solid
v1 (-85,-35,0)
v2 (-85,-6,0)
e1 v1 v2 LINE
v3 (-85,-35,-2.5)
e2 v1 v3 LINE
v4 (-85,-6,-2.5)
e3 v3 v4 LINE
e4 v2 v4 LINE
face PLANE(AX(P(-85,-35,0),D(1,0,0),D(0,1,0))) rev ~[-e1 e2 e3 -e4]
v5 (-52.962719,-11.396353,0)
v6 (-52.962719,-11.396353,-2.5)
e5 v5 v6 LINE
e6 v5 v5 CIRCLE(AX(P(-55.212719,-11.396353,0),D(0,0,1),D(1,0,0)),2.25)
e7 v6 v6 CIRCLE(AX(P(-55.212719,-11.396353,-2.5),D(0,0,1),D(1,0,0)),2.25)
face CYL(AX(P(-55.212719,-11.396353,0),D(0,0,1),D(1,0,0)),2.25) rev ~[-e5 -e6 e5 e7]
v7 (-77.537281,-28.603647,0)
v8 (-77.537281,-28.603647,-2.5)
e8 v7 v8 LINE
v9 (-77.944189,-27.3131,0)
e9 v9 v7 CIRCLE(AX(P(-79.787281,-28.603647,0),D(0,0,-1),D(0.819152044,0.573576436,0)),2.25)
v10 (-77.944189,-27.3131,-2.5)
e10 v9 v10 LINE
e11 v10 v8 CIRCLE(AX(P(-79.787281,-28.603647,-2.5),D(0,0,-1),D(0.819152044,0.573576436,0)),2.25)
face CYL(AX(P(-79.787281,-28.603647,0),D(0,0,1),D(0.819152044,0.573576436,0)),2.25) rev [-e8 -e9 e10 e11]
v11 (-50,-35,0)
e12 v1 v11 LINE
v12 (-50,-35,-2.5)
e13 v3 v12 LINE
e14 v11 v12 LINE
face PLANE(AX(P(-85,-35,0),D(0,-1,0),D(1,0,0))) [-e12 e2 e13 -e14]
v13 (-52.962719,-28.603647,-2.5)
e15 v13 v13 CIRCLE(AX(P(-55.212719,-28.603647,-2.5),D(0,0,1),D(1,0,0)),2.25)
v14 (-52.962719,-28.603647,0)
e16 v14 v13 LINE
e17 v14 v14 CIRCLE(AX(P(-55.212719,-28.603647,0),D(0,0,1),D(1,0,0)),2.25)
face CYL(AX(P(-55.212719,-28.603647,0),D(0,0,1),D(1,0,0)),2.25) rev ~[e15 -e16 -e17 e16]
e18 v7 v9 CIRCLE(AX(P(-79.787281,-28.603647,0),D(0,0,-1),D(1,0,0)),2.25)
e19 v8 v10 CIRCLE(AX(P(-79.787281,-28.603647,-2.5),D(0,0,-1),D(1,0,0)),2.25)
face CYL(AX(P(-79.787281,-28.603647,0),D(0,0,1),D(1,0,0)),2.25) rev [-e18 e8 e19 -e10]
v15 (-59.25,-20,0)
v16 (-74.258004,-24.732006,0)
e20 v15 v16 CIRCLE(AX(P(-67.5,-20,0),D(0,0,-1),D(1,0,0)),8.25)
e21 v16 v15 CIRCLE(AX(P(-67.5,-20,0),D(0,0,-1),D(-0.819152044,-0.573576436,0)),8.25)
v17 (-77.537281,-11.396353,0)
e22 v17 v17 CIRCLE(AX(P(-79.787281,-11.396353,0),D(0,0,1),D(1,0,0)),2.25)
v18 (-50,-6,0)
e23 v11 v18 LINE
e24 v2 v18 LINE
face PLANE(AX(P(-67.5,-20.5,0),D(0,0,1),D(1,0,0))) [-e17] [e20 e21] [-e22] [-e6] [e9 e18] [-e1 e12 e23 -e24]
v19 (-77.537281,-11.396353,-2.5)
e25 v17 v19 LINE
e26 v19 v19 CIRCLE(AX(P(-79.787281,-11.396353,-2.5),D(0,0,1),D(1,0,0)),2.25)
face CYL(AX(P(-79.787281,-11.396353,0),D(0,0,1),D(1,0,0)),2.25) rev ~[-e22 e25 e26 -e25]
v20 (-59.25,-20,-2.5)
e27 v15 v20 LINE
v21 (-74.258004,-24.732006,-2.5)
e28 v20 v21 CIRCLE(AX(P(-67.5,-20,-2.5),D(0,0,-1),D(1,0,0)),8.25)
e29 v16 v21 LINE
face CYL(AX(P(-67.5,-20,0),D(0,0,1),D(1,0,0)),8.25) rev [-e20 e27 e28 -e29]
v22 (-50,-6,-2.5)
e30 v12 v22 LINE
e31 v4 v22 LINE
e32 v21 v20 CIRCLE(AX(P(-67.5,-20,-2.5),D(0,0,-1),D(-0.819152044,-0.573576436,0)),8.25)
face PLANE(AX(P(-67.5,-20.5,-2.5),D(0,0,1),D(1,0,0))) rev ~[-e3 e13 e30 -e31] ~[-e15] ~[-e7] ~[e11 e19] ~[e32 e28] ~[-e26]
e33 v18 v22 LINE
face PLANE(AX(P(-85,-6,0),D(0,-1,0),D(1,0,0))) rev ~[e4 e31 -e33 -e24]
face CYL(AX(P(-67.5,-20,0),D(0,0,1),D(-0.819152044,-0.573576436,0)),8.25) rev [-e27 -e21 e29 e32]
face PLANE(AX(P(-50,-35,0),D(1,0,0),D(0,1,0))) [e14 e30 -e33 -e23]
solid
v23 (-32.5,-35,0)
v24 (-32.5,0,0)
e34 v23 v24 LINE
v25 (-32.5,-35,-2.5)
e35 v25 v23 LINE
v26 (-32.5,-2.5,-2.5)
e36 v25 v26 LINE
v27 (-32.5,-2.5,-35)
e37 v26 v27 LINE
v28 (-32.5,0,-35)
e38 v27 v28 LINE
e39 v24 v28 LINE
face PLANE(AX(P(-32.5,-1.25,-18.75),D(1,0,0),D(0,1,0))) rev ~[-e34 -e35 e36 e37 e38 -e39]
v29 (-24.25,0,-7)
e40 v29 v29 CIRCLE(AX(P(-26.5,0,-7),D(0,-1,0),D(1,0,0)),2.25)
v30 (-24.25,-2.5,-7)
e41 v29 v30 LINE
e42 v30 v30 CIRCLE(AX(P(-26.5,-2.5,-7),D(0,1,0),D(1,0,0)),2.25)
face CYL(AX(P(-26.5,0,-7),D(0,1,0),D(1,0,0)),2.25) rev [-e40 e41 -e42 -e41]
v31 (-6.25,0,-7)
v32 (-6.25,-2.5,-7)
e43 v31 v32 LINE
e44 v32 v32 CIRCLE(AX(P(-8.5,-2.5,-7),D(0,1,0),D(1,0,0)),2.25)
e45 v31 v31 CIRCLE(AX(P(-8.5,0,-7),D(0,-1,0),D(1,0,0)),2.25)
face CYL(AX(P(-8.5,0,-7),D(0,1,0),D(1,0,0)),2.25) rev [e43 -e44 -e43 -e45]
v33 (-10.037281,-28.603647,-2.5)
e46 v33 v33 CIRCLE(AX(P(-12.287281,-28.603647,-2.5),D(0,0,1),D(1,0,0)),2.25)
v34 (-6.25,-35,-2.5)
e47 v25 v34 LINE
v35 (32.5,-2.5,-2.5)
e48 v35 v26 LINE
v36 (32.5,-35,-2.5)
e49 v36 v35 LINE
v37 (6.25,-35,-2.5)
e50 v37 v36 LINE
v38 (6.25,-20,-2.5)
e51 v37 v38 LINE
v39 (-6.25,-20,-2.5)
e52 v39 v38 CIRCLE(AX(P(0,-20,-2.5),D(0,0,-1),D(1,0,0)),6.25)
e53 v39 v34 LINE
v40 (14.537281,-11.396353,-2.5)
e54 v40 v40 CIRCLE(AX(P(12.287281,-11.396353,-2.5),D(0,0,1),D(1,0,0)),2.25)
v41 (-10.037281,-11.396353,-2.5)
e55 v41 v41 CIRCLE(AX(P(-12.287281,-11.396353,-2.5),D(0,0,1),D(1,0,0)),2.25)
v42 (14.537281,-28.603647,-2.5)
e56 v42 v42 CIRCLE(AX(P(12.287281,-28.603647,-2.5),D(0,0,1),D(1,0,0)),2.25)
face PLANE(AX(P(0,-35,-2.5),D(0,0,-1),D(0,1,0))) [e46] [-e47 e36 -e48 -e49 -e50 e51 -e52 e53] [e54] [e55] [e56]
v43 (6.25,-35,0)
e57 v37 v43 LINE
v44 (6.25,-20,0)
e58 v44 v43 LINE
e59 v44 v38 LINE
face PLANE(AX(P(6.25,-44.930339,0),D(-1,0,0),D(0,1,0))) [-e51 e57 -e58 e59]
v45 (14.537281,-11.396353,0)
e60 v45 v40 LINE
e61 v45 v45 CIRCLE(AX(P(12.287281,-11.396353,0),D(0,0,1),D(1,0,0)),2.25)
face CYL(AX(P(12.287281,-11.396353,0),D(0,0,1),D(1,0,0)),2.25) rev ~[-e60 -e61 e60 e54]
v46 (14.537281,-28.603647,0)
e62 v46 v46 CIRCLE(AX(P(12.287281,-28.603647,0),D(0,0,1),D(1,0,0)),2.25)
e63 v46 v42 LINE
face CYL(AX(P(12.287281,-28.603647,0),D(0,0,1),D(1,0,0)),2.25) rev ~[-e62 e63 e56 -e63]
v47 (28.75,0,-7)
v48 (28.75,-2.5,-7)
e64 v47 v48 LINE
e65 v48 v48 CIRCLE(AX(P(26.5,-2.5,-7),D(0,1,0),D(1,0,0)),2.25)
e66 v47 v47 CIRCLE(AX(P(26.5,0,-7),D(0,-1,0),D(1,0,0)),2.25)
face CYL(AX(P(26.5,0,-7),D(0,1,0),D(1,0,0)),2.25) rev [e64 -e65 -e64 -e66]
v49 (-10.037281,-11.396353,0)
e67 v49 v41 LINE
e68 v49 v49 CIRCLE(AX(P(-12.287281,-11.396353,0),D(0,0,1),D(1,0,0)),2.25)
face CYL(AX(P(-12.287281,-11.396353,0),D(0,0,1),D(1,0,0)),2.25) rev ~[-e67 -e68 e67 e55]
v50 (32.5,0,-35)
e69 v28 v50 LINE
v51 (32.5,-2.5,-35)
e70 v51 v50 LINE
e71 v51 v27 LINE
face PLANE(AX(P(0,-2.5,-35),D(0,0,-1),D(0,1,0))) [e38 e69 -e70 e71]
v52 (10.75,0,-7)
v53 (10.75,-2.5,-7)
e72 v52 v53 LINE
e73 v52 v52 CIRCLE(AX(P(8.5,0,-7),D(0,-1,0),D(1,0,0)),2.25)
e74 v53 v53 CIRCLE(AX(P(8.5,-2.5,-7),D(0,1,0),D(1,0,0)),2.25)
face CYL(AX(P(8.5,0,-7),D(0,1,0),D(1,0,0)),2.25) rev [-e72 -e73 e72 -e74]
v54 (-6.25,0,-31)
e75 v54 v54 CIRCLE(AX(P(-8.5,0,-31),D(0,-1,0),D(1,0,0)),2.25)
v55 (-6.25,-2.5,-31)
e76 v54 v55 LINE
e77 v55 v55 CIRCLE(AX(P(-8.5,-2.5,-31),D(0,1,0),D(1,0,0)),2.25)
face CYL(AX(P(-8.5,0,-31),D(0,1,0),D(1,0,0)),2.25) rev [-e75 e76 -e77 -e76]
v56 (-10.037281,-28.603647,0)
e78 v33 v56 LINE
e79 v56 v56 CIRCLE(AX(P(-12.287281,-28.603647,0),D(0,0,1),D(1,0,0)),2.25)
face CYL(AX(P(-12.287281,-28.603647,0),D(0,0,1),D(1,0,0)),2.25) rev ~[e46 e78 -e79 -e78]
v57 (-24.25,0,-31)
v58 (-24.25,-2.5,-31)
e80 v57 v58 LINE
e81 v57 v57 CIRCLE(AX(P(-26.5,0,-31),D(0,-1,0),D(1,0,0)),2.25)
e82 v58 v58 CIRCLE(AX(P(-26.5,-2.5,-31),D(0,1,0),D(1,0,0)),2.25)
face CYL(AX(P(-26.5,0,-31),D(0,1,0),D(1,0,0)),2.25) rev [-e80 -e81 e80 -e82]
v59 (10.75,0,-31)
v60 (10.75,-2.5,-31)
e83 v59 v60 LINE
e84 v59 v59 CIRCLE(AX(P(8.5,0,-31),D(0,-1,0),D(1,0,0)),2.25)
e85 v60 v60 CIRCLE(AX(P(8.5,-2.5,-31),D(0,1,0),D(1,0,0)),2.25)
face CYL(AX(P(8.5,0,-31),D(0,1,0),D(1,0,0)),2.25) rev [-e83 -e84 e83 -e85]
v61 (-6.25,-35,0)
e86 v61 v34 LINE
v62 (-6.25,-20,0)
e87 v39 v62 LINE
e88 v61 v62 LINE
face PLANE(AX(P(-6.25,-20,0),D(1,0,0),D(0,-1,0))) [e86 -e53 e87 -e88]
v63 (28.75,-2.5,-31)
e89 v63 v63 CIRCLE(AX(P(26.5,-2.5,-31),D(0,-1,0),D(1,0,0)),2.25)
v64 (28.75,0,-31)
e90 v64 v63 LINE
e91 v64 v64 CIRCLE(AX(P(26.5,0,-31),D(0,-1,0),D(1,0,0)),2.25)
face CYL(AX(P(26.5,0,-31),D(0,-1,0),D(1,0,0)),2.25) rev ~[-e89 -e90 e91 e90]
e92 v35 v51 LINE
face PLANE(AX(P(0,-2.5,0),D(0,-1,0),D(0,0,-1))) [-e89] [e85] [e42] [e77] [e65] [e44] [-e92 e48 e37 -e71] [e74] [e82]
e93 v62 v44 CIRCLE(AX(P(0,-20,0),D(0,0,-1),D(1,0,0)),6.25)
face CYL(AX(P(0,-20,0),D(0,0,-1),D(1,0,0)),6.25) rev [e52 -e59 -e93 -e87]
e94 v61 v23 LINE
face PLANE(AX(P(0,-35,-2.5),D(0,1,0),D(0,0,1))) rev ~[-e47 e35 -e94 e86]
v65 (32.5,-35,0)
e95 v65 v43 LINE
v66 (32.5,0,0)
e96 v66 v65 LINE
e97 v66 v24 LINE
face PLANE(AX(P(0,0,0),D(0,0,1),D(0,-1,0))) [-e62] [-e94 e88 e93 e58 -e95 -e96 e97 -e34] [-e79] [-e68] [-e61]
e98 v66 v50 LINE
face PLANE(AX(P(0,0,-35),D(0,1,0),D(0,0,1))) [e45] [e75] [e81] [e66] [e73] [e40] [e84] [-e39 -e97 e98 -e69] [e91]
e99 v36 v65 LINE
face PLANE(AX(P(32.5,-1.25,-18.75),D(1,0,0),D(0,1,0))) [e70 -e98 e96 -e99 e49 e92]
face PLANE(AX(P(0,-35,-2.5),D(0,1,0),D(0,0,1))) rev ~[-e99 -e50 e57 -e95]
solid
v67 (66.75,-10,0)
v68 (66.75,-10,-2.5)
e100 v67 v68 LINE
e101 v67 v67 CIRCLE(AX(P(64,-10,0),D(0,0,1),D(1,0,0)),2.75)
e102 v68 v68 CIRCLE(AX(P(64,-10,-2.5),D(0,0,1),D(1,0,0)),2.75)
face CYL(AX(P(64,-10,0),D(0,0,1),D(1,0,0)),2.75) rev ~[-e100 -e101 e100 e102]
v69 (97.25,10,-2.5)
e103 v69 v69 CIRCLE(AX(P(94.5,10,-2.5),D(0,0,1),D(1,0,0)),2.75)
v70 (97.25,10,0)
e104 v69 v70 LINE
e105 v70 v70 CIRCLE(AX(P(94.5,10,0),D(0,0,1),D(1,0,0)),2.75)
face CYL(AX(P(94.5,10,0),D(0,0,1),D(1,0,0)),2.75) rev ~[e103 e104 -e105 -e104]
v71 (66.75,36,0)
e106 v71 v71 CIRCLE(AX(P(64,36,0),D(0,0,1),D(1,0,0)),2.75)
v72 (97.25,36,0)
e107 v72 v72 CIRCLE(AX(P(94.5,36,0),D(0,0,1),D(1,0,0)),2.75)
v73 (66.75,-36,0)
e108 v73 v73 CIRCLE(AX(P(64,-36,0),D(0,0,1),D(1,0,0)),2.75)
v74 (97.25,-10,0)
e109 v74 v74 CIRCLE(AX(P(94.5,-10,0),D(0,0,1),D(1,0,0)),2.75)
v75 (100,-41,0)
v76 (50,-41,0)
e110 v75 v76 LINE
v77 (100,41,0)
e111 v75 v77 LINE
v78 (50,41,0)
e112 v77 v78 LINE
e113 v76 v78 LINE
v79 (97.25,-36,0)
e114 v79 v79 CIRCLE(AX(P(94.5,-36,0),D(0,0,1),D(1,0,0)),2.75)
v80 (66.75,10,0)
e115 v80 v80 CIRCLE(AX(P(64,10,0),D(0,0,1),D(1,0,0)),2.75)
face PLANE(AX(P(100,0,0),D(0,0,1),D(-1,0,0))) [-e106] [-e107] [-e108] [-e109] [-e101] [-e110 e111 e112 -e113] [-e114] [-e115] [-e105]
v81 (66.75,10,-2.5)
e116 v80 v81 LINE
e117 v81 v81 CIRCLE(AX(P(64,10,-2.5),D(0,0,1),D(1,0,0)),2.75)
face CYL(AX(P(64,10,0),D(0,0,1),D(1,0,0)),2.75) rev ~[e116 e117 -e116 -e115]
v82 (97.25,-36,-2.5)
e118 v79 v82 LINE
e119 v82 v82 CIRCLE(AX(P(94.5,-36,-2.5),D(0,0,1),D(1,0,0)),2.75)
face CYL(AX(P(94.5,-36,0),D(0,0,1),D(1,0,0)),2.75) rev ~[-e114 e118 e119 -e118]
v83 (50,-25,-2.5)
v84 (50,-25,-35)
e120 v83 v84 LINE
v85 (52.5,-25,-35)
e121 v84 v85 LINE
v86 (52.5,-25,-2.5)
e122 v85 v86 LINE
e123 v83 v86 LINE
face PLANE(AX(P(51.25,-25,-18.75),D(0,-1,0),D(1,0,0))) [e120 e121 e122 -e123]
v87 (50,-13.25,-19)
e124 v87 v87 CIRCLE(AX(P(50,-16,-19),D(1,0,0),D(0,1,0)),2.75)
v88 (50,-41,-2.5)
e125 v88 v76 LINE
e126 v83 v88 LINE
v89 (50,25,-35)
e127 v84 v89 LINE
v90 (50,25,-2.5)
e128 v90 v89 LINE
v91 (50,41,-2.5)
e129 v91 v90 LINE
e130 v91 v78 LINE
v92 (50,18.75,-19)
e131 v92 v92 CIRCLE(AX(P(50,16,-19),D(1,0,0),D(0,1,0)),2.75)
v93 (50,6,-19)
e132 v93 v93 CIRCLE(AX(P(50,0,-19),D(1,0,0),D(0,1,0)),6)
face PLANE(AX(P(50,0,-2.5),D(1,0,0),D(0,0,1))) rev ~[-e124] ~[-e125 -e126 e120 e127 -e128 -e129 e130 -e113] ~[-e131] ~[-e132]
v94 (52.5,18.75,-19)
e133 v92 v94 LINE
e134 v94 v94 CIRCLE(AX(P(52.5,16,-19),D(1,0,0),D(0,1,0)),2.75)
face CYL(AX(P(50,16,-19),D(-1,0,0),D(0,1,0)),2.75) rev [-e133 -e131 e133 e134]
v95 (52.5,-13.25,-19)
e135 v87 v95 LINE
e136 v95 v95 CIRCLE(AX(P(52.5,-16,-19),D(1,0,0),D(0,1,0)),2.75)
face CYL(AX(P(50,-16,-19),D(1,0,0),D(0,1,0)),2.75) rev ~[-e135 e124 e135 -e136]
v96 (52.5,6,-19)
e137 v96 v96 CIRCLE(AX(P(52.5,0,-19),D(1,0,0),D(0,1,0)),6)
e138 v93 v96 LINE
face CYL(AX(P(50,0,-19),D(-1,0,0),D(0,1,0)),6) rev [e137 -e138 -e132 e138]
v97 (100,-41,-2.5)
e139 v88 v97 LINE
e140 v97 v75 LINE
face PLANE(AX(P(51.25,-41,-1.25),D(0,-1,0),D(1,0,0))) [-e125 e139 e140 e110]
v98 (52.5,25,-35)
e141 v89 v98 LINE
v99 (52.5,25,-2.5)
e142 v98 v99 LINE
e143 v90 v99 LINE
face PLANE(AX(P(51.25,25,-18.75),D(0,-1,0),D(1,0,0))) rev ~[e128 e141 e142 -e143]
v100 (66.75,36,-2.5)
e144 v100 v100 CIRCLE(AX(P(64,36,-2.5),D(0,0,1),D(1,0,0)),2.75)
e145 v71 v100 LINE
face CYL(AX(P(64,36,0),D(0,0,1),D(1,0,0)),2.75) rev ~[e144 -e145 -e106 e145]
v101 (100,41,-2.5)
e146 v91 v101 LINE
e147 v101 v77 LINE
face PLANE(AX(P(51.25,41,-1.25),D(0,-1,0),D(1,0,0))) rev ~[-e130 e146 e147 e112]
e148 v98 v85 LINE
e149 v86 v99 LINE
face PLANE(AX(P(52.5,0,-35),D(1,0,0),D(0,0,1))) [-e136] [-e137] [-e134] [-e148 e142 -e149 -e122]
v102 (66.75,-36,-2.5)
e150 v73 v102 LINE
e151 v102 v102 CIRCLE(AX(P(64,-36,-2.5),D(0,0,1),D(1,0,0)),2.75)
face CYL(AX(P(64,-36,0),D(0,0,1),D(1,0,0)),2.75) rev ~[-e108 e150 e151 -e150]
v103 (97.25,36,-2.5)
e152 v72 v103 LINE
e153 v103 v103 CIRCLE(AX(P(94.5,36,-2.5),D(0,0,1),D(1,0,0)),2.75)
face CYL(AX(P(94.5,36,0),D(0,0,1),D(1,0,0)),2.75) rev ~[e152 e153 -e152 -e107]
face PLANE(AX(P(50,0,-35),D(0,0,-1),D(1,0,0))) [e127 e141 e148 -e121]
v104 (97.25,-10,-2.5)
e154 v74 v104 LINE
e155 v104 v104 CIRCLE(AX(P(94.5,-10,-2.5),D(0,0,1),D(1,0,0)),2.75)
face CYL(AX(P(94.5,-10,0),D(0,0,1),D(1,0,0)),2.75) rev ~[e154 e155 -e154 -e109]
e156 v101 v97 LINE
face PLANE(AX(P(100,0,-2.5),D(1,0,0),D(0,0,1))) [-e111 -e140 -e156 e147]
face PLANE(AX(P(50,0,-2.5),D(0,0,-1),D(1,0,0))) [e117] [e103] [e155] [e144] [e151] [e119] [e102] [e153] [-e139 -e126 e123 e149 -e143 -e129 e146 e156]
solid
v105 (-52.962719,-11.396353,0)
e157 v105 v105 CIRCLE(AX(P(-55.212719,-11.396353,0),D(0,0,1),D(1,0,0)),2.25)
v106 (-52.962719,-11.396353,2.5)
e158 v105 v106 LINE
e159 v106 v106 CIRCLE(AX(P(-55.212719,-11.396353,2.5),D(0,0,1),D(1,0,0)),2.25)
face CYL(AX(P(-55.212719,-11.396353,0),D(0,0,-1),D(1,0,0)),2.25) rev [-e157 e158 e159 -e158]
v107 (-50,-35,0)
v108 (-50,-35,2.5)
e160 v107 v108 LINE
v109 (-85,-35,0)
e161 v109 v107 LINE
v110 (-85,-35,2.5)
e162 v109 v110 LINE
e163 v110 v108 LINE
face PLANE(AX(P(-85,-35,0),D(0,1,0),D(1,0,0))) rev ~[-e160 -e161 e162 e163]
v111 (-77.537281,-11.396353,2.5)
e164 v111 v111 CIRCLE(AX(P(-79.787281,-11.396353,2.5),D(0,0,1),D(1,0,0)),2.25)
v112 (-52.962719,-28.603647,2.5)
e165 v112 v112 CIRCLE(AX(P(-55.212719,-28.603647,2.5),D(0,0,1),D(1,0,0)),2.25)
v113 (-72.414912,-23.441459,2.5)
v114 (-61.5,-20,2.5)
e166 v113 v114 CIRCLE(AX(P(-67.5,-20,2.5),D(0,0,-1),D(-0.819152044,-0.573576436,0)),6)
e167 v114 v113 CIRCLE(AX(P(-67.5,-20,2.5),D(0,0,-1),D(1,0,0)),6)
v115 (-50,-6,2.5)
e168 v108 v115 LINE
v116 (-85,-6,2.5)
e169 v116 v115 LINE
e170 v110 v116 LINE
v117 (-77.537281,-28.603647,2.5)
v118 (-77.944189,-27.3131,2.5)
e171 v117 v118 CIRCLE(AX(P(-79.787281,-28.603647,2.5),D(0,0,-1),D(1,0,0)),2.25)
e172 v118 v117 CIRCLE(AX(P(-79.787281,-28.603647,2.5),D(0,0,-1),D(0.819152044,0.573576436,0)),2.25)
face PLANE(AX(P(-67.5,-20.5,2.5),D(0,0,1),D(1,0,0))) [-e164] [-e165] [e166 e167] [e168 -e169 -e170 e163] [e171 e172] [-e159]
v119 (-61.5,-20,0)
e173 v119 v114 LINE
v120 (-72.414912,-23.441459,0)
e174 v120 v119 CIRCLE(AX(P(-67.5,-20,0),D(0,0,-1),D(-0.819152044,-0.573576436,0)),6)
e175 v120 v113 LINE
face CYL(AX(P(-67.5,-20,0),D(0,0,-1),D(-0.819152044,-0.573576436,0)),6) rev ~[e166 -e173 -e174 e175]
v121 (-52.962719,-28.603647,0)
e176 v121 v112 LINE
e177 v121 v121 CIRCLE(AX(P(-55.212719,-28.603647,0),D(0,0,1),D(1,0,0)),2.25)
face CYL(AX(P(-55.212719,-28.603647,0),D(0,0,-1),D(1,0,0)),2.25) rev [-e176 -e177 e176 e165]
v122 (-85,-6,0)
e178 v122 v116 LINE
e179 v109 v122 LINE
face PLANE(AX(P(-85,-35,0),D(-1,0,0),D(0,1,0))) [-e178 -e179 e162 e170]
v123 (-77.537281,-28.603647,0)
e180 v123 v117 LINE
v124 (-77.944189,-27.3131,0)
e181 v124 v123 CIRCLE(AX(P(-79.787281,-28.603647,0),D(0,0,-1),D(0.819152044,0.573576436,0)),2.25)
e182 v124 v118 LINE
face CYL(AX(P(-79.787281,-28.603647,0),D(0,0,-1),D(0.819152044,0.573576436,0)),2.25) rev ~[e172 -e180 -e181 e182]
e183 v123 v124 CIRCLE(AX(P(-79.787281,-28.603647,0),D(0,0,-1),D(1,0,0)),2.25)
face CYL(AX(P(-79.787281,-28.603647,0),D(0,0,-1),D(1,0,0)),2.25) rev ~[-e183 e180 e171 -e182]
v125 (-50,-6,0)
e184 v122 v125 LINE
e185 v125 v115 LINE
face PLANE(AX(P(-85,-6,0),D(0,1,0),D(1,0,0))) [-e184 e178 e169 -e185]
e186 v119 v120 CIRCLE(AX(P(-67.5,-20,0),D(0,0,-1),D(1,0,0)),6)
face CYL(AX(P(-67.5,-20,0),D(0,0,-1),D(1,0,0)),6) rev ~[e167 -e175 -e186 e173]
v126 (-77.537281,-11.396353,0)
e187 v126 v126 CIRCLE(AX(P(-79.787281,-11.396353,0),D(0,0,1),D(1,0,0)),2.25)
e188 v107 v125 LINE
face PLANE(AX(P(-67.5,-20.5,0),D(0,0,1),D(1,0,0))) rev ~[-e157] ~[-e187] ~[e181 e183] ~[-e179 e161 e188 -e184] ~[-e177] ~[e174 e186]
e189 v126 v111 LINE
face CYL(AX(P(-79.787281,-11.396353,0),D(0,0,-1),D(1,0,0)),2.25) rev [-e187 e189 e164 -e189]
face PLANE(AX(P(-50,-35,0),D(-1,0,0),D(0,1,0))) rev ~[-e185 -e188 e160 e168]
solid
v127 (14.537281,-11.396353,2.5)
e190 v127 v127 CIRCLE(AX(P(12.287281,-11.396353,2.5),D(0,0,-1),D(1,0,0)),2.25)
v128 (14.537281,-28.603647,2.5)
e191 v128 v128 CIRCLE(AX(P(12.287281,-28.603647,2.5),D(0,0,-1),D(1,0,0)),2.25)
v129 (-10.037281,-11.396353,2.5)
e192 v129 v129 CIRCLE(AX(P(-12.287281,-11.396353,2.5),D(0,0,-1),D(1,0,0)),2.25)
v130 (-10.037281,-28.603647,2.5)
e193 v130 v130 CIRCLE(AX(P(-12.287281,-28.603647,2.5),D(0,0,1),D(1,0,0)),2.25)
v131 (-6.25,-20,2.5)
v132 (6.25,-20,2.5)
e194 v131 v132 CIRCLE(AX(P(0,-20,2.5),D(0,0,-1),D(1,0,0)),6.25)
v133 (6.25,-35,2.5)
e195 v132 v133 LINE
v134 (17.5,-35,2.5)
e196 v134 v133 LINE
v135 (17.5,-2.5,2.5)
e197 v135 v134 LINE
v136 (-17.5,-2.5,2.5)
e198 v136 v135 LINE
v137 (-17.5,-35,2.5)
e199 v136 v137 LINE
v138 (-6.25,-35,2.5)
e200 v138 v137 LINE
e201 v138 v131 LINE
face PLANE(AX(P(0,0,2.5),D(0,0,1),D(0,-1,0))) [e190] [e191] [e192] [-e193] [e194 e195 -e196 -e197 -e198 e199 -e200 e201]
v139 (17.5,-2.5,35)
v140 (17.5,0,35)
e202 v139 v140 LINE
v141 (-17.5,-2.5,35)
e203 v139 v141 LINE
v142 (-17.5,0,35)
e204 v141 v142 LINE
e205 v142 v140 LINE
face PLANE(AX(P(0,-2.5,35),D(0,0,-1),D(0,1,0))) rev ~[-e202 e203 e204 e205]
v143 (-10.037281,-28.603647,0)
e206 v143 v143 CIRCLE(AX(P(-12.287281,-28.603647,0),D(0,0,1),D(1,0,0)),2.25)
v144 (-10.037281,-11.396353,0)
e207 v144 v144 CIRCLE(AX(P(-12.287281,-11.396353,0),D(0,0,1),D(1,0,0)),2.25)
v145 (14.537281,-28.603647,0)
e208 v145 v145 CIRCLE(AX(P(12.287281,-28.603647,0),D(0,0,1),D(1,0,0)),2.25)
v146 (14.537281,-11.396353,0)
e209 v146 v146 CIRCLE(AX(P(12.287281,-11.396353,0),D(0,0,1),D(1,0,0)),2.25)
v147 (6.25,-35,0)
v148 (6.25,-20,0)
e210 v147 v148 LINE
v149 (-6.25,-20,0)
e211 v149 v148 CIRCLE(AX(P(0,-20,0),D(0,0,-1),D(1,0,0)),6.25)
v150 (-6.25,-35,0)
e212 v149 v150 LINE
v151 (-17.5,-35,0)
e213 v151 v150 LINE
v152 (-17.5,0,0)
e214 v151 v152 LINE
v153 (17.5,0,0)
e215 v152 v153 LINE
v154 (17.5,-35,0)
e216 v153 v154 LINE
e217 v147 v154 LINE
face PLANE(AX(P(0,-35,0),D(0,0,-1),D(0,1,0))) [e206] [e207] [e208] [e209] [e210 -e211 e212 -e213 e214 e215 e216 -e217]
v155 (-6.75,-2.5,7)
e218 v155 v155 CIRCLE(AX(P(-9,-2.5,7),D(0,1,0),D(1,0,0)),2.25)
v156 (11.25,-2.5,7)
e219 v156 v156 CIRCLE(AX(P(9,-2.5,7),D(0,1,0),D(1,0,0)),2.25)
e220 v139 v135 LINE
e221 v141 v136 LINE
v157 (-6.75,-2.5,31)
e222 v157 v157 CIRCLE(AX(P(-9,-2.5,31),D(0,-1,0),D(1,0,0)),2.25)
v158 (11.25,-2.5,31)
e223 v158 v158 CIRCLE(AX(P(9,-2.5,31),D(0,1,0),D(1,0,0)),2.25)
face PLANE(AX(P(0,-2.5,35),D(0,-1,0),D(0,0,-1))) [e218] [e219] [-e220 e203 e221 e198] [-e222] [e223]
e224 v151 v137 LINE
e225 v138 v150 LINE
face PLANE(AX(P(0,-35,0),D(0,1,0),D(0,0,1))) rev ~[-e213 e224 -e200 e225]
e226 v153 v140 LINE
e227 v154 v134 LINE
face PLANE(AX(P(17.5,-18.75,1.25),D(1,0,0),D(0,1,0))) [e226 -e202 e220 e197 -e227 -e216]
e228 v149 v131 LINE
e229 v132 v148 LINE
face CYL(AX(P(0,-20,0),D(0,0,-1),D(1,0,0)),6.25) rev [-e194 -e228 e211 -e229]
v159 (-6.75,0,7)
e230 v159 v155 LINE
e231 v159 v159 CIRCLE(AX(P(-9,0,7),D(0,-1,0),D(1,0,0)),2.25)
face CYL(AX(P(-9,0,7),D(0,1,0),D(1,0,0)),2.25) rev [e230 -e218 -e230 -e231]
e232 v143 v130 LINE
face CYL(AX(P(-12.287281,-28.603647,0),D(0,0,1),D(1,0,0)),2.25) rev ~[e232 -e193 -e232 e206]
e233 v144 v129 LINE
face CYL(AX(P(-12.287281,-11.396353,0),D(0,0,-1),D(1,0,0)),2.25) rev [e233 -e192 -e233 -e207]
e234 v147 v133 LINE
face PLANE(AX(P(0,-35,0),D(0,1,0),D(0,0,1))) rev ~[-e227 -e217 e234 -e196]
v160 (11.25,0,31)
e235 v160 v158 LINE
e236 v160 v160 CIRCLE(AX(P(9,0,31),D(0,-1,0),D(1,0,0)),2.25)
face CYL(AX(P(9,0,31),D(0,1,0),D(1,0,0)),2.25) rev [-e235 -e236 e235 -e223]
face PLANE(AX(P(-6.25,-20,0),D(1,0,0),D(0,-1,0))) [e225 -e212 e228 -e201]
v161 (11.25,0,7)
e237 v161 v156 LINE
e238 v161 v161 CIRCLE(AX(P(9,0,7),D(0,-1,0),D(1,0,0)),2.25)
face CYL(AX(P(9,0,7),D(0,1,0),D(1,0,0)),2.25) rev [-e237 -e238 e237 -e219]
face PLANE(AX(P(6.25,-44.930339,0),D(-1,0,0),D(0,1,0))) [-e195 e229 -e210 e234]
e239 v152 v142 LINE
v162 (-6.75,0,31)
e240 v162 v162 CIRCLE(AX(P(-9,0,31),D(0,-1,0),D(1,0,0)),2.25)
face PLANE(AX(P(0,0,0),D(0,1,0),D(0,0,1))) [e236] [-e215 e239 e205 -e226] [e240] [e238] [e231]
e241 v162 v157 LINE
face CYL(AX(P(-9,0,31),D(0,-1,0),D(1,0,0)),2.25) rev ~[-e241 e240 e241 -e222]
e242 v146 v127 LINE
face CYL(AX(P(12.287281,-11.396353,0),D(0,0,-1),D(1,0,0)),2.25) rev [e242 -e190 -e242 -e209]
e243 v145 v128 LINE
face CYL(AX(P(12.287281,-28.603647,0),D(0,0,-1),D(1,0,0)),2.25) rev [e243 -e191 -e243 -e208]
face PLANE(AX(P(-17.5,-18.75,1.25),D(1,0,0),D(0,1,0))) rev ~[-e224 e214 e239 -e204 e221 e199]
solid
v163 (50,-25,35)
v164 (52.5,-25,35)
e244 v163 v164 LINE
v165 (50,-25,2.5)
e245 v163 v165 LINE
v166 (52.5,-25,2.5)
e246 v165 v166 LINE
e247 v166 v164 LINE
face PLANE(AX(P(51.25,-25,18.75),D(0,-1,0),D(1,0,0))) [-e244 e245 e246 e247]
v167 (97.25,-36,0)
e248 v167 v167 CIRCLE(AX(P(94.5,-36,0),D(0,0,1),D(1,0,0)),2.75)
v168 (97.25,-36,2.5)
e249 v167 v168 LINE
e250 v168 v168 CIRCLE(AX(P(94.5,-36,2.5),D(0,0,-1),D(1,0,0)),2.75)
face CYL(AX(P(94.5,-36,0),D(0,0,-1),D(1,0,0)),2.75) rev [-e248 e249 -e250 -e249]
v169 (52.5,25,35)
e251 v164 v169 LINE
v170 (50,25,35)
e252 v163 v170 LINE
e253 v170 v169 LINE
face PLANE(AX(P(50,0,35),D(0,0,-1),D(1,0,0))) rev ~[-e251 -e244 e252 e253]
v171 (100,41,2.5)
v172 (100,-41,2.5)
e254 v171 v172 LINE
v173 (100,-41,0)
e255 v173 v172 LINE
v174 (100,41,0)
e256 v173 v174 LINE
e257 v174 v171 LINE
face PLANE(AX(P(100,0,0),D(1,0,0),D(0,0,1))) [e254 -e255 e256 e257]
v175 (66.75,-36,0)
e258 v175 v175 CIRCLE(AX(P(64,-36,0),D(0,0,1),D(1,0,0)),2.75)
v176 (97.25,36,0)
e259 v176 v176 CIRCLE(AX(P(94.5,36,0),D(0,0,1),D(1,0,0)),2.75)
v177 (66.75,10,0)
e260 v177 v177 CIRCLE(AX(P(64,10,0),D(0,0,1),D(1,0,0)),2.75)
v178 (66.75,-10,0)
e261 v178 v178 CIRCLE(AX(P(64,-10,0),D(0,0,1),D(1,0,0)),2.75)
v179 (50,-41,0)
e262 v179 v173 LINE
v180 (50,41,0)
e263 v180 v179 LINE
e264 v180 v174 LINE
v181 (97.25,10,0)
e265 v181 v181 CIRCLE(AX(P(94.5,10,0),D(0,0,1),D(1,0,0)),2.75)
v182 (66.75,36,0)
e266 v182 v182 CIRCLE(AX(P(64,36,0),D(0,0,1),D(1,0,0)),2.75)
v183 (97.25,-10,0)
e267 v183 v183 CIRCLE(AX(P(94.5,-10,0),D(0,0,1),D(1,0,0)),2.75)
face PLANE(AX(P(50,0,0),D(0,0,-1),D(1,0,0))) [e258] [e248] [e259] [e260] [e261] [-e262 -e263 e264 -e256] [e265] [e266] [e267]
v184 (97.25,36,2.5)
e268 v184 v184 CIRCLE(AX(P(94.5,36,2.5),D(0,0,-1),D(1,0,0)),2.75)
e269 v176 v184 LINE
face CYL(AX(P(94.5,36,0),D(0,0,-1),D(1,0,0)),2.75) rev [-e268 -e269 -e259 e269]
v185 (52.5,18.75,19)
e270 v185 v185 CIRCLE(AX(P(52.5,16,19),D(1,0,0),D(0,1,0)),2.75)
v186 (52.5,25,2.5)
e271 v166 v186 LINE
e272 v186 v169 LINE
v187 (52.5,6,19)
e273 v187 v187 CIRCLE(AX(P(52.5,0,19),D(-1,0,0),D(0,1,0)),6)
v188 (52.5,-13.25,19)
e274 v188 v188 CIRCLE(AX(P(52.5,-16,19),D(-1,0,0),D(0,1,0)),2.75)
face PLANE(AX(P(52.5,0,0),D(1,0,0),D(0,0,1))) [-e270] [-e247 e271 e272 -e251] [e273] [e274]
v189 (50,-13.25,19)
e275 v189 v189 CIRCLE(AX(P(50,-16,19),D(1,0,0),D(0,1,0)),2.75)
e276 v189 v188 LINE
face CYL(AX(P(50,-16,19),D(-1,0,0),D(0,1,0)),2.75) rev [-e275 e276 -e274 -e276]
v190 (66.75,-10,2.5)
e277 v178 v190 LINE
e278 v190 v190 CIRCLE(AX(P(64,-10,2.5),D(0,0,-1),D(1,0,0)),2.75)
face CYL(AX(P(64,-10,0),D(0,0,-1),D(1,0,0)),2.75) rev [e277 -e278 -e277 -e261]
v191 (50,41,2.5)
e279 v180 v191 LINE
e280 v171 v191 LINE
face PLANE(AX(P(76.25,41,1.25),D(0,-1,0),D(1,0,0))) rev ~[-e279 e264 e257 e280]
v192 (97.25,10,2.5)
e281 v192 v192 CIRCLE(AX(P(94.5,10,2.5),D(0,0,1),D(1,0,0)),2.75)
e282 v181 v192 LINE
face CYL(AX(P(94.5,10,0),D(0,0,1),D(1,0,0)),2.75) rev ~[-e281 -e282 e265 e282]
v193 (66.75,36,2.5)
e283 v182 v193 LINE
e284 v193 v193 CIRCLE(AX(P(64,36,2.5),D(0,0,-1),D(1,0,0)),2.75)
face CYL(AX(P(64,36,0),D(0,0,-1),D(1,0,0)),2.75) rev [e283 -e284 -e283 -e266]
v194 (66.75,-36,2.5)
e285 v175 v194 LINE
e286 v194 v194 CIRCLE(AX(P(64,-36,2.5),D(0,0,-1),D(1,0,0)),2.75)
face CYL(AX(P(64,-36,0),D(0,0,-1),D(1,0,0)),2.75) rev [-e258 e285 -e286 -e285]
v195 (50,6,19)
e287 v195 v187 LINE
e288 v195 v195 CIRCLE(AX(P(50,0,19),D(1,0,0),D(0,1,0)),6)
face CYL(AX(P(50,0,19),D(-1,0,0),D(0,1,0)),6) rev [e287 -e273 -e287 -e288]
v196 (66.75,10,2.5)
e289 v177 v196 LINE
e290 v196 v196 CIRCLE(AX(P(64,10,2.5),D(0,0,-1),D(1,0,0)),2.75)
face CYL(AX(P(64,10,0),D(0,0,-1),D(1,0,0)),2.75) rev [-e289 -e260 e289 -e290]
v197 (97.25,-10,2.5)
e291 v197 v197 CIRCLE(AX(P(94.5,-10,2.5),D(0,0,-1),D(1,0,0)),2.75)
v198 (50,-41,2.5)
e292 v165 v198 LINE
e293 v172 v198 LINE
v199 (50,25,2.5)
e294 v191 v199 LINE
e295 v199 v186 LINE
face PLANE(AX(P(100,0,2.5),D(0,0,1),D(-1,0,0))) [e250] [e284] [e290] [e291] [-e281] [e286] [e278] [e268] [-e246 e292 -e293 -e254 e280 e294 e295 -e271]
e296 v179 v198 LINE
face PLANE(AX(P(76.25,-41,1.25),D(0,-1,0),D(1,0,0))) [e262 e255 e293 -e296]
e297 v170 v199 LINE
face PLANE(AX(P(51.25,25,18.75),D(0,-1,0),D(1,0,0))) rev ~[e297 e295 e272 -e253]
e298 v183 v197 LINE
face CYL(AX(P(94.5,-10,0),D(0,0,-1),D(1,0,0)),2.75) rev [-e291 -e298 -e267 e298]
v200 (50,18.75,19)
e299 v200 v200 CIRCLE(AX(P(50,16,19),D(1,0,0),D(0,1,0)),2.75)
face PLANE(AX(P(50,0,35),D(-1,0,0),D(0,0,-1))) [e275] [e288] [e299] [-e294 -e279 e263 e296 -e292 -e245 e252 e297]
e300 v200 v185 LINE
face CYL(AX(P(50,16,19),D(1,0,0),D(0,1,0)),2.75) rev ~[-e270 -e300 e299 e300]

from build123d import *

# Parameters (mm, degrees)
F1_W      = 32.5
F1_H      = 2.5
F1_W_2    = 2.5
F2_DEPTH  = 17.5
F1_H_2    = 32.5
F3_DEPTH  = 17.5
F4_W      = 32.5
F4_H      = 2.5
F4_W_2    = 2.5
F5_DEPTH  = 32.5
F4_H_2    = 32.5
F6_DEPTH  = 32.5
F7_R      = 2.25
F8_DEPTH  = 5
F9_DEPTH  = 5
F11_R     = 2.25
F12_DEPTH = 5
F10_W     = 35
F10_H     = 29
F10_R     = 2.25
F13_DEPTH = 2.5
F14_DEPTH = 2.5
F15_W     = 2.5
F15_H     = 32.5
F15_H_2   = 2.5
F16_DEPTH = 25
F15_W_2   = 47.5
F17_DEPTH = 41
F18_DEPTH = 41
F19_DEPTH = 25
F20_R     = 2.75
F20_R_2   = 6
F21_DEPTH = 2.5
F22_DEPTH = 5
F23_R     = 2.75
F24_DEPTH = 5


with BuildPart() as f2:
    # F1 (on Right) → F2 (new body, symmetric)
    with BuildSketch(Plane.YZ):
        with Locations((-18.75, 1.25)):
            Rectangle(F1_W, F1_H)
        with Locations((-1.25, 1.25)):
            Rectangle(F1_W_2, F1_H)
    extrude(amount=F2_DEPTH, both=True)

    # F1 (on Right) → F3 (join, symmetric)
    with BuildSketch(Plane.YZ):
        with Locations((-1.25, 1.25)):
            Rectangle(F1_W_2, F1_H)
        with Locations((-1.25, 18.75)):
            Rectangle(F1_W_2, F1_H_2)
    extrude(amount=F3_DEPTH, both=True)

    # F7 (on Front) → F8 (cut, symmetric)
    with BuildSketch(Plane.XZ):
        with Locations((9, 31)):
            Circle(F7_R)
        with Locations((9, 7)):
            Circle(F7_R)
        with Locations((-9, 7)):
            Circle(F7_R)
        with Locations((-9, 31)):
            Circle(F7_R)
    extrude(amount=F8_DEPTH, both=True, mode=Mode.SUBTRACT)


with BuildPart() as f5:
    # F4 (on Right) → F5 (new body, symmetric)
    with BuildSketch(Plane.YZ):
        with Locations((-18.75, -1.25)):
            Rectangle(F4_W, F4_H)
        with Locations((-1.25, -1.25)):
            Rectangle(F4_W_2, F4_H)
    extrude(amount=F5_DEPTH, both=True)

    # F4 (on Right) → F6 (join, symmetric)
    with BuildSketch(Plane.YZ):
        with Locations((-1.25, -18.75)):
            Rectangle(F4_W_2, F4_H_2)
        with Locations((-1.25, -1.25)):
            Rectangle(F4_W_2, F4_H)
    extrude(amount=F6_DEPTH, both=True)

    # F7 (on Front) → F9 (cut, symmetric)
    with BuildSketch(Plane.XZ):
        with Locations((26.5, -7)):
            Circle(F7_R)
        with Locations((8.5, -7)):
            Circle(F7_R)
        with Locations((-8.5, -7)):
            Circle(F7_R)
        with Locations((-26.5, -7)):
            Circle(F7_R)
        with Locations((-26.5, -31)):
            Circle(F7_R)
        with Locations((-8.5, -31)):
            Circle(F7_R)
        with Locations((8.5, -31)):
            Circle(F7_R)
        with Locations((26.5, -31)):
            Circle(F7_R)
    extrude(amount=F9_DEPTH, both=True, mode=Mode.SUBTRACT)


with BuildPart() as f12_tool:
    # F11 (on Top) → F12 (new body, symmetric)
    with BuildSketch(Plane.XY):
        with BuildLine():
            ThreePointArc((-6.25, -20), (0, -26.25), (6.25, -20))
            ThreePointArc((6.25, -20), (0, -13.75), (-6.25, -20))
        make_face()
        with BuildLine():
            Line((6.25, -44.9303393665), (6.25, -20))
            ThreePointArc((6.25, -20), (0, -26.25), (-6.25, -20))
            Line((-6.25, -20), (-6.25, -44.9303393665))
            Line((-6.25, -44.9303393665), (6.25, -44.9303393665))
        make_face()
        with Locations((-12.2872806643, -11.3963534547)):
            Circle(F11_R)
        with Locations((12.2872806643, -11.3963534547)):
            Circle(F11_R)
        with Locations((12.2872806643, -28.6036465453)):
            Circle(F11_R)
        with Locations((-12.2872806643, -28.6036465453)):
            Circle(F11_R)
    extrude(amount=F12_DEPTH, both=True)


with BuildPart() as f2_1:
    add(f2.part)

    # F12: cut by f12_tool
    add(f12_tool.part, mode=Mode.SUBTRACT)


with BuildPart() as f5_1:
    add(f5.part)

    # F12: cut by f12_tool
    add(f12_tool.part, mode=Mode.SUBTRACT)


with BuildPart() as f13:
    # F10 (on Top) → F13 (new body)
    with BuildSketch(Plane.XY):
        with Locations((-67.5, -20.5)):
            Rectangle(F10_W, F10_H)
        with BuildLine():
            ThreePointArc((-77.5372806643, -28.6036465453), (-81.9331438035, -29.2802345942), (-77.9441885647, -27.3130995635))
            ThreePointArc((-77.9441885647, -27.3130995635), (-77.6414175252, -27.9270584964), (-77.5372806643, -28.6036465453))
        make_face(mode=Mode.SUBTRACT)
        with Locations((-55.2127193357, -28.6036465453)):
            Circle(F10_R, mode=Mode.SUBTRACT)
        with Locations((-79.7872806643, -11.3963534547)):
            Circle(F10_R, mode=Mode.SUBTRACT)
        with BuildLine():
            ThreePointArc((-74.2580043654, -24.7320055999), (-69.9808228459, -12.1318351563), (-59.25, -20))
            ThreePointArc((-59.25, -20), (-65.0191771541, -27.8681648437), (-74.2580043654, -24.7320055999))
        make_face(mode=Mode.SUBTRACT)
        with Locations((-55.2127193357, -11.3963534547)):
            Circle(F10_R, mode=Mode.SUBTRACT)
    extrude(amount=-F13_DEPTH)


with BuildPart() as f14:
    # F10 (on Top) → F14 (new body)
    with BuildSketch(Plane.XY):
        with Locations((-67.5, -20.5)):
            Rectangle(F10_W, F10_H)
        with BuildLine():
            ThreePointArc((-77.5372806643, -28.6036465453), (-81.9331438035, -29.2802345942), (-77.9441885647, -27.3130995635))
            ThreePointArc((-77.9441885647, -27.3130995635), (-77.6414175252, -27.9270584964), (-77.5372806643, -28.6036465453))
        make_face(mode=Mode.SUBTRACT)
        with Locations((-55.2127193357, -28.6036465453)):
            Circle(F10_R, mode=Mode.SUBTRACT)
        with Locations((-79.7872806643, -11.3963534547)):
            Circle(F10_R, mode=Mode.SUBTRACT)
        with BuildLine():
            ThreePointArc((-74.2580043654, -24.7320055999), (-69.9808228459, -12.1318351563), (-59.25, -20))
            ThreePointArc((-59.25, -20), (-65.0191771541, -27.8681648437), (-74.2580043654, -24.7320055999))
        make_face(mode=Mode.SUBTRACT)
        with Locations((-55.2127193357, -11.3963534547)):
            Circle(F10_R, mode=Mode.SUBTRACT)
        with BuildLine():
            ThreePointArc((-74.2580043654, -24.7320055999), (-65.0191771541, -27.8681648437), (-59.25, -20))
            ThreePointArc((-59.25, -20), (-69.9808228459, -12.1318351563), (-74.2580043654, -24.7320055999))
        make_face()
        with BuildLine():
            ThreePointArc((-61.5, -20), (-65.695765203, -25.7223017045), (-72.4149122657, -23.4414586181))
            ThreePointArc((-72.4149122657, -23.4414586181), (-69.304234797, -14.2776982955), (-61.5, -20))
        make_face(mode=Mode.SUBTRACT)
    extrude(amount=F14_DEPTH)


with BuildPart() as f16:
    # F15 (on Front) → F16 (new body, symmetric)
    with BuildSketch(Plane.XZ):
        with Locations((51.25, -18.75)):
            Rectangle(F15_W, F15_H)
        with Locations((51.25, -1.25)):
            Rectangle(F15_W, F15_H_2)
    extrude(amount=F16_DEPTH, both=True)

    # F15 (on Front) → F17 (join, symmetric)
    with BuildSketch(Plane.XZ):
        with Locations((51.25, -1.25)):
            Rectangle(F15_W, F15_H_2)
        with Locations((76.25, -1.25)):
            Rectangle(F15_W_2, F15_H_2)
    extrude(amount=F17_DEPTH, both=True)

    # F20 (on offset) → F21 (cut, symmetric)
    with BuildSketch(Plane.YZ.offset(50)):
        with Locations((16, -19)):
            Circle(F20_R)
        with Locations((0, -19)):
            Circle(F20_R_2)
        with Locations((-16, -19)):
            Circle(F20_R)
    extrude(amount=F21_DEPTH, both=True, mode=Mode.SUBTRACT)


with BuildPart() as f18:
    # F15 (on Front) → F18 (new body, symmetric)
    with BuildSketch(Plane.XZ):
        with Locations((76.25, 1.25)):
            Rectangle(F15_W_2, F15_H_2)
        with Locations((51.25, 1.25)):
            Rectangle(F15_W, F15_H_2)
    extrude(amount=F18_DEPTH, both=True)

    # F15 (on Front) → F19 (join, symmetric)
    with BuildSketch(Plane.XZ):
        with Locations((51.25, 18.75)):
            Rectangle(F15_W, F15_H)
        with Locations((51.25, 1.25)):
            Rectangle(F15_W, F15_H_2)
    extrude(amount=F19_DEPTH, both=True)

    # F20 (on offset) → F22 (cut, symmetric)
    with BuildSketch(Plane.YZ.offset(50)):
        with Locations((-16, 19)):
            Circle(F20_R)
        with Locations((0, 19)):
            Circle(F20_R_2)
        with Locations((16, 19)):
            Circle(F20_R)
    extrude(amount=F22_DEPTH, both=True, mode=Mode.SUBTRACT)


with BuildPart() as f24_tool:
    # F23 (on Top) → F24 (new body, symmetric)
    with BuildSketch(Plane.XY):
        with Locations((64, -10)):
            Circle(F23_R)
        with Locations((94.5, -10)):
            Circle(F23_R)
        with Locations((94.5, -36)):
            Circle(F23_R)
        with Locations((64, -36)):
            Circle(F23_R)
        with Locations((64, 36)):
            Circle(F23_R)
        with Locations((94.5, 36)):
            Circle(F23_R)
        with Locations((64, 10)):
            Circle(F23_R)
        with Locations((94.5, 10)):
            Circle(F23_R)
    extrude(amount=F24_DEPTH, both=True)


with BuildPart() as f16_1:
    add(f16.part)

    # F24: cut by f24_tool
    add(f24_tool.part, mode=Mode.SUBTRACT)


with BuildPart() as f18_1:
    add(f18.part)

    # F24: cut by f24_tool
    add(f24_tool.part, mode=Mode.SUBTRACT)


solid = Compound([f2_1.part, f5_1.part, f13.part, f14.part, f16_1.part, f18_1.part])
